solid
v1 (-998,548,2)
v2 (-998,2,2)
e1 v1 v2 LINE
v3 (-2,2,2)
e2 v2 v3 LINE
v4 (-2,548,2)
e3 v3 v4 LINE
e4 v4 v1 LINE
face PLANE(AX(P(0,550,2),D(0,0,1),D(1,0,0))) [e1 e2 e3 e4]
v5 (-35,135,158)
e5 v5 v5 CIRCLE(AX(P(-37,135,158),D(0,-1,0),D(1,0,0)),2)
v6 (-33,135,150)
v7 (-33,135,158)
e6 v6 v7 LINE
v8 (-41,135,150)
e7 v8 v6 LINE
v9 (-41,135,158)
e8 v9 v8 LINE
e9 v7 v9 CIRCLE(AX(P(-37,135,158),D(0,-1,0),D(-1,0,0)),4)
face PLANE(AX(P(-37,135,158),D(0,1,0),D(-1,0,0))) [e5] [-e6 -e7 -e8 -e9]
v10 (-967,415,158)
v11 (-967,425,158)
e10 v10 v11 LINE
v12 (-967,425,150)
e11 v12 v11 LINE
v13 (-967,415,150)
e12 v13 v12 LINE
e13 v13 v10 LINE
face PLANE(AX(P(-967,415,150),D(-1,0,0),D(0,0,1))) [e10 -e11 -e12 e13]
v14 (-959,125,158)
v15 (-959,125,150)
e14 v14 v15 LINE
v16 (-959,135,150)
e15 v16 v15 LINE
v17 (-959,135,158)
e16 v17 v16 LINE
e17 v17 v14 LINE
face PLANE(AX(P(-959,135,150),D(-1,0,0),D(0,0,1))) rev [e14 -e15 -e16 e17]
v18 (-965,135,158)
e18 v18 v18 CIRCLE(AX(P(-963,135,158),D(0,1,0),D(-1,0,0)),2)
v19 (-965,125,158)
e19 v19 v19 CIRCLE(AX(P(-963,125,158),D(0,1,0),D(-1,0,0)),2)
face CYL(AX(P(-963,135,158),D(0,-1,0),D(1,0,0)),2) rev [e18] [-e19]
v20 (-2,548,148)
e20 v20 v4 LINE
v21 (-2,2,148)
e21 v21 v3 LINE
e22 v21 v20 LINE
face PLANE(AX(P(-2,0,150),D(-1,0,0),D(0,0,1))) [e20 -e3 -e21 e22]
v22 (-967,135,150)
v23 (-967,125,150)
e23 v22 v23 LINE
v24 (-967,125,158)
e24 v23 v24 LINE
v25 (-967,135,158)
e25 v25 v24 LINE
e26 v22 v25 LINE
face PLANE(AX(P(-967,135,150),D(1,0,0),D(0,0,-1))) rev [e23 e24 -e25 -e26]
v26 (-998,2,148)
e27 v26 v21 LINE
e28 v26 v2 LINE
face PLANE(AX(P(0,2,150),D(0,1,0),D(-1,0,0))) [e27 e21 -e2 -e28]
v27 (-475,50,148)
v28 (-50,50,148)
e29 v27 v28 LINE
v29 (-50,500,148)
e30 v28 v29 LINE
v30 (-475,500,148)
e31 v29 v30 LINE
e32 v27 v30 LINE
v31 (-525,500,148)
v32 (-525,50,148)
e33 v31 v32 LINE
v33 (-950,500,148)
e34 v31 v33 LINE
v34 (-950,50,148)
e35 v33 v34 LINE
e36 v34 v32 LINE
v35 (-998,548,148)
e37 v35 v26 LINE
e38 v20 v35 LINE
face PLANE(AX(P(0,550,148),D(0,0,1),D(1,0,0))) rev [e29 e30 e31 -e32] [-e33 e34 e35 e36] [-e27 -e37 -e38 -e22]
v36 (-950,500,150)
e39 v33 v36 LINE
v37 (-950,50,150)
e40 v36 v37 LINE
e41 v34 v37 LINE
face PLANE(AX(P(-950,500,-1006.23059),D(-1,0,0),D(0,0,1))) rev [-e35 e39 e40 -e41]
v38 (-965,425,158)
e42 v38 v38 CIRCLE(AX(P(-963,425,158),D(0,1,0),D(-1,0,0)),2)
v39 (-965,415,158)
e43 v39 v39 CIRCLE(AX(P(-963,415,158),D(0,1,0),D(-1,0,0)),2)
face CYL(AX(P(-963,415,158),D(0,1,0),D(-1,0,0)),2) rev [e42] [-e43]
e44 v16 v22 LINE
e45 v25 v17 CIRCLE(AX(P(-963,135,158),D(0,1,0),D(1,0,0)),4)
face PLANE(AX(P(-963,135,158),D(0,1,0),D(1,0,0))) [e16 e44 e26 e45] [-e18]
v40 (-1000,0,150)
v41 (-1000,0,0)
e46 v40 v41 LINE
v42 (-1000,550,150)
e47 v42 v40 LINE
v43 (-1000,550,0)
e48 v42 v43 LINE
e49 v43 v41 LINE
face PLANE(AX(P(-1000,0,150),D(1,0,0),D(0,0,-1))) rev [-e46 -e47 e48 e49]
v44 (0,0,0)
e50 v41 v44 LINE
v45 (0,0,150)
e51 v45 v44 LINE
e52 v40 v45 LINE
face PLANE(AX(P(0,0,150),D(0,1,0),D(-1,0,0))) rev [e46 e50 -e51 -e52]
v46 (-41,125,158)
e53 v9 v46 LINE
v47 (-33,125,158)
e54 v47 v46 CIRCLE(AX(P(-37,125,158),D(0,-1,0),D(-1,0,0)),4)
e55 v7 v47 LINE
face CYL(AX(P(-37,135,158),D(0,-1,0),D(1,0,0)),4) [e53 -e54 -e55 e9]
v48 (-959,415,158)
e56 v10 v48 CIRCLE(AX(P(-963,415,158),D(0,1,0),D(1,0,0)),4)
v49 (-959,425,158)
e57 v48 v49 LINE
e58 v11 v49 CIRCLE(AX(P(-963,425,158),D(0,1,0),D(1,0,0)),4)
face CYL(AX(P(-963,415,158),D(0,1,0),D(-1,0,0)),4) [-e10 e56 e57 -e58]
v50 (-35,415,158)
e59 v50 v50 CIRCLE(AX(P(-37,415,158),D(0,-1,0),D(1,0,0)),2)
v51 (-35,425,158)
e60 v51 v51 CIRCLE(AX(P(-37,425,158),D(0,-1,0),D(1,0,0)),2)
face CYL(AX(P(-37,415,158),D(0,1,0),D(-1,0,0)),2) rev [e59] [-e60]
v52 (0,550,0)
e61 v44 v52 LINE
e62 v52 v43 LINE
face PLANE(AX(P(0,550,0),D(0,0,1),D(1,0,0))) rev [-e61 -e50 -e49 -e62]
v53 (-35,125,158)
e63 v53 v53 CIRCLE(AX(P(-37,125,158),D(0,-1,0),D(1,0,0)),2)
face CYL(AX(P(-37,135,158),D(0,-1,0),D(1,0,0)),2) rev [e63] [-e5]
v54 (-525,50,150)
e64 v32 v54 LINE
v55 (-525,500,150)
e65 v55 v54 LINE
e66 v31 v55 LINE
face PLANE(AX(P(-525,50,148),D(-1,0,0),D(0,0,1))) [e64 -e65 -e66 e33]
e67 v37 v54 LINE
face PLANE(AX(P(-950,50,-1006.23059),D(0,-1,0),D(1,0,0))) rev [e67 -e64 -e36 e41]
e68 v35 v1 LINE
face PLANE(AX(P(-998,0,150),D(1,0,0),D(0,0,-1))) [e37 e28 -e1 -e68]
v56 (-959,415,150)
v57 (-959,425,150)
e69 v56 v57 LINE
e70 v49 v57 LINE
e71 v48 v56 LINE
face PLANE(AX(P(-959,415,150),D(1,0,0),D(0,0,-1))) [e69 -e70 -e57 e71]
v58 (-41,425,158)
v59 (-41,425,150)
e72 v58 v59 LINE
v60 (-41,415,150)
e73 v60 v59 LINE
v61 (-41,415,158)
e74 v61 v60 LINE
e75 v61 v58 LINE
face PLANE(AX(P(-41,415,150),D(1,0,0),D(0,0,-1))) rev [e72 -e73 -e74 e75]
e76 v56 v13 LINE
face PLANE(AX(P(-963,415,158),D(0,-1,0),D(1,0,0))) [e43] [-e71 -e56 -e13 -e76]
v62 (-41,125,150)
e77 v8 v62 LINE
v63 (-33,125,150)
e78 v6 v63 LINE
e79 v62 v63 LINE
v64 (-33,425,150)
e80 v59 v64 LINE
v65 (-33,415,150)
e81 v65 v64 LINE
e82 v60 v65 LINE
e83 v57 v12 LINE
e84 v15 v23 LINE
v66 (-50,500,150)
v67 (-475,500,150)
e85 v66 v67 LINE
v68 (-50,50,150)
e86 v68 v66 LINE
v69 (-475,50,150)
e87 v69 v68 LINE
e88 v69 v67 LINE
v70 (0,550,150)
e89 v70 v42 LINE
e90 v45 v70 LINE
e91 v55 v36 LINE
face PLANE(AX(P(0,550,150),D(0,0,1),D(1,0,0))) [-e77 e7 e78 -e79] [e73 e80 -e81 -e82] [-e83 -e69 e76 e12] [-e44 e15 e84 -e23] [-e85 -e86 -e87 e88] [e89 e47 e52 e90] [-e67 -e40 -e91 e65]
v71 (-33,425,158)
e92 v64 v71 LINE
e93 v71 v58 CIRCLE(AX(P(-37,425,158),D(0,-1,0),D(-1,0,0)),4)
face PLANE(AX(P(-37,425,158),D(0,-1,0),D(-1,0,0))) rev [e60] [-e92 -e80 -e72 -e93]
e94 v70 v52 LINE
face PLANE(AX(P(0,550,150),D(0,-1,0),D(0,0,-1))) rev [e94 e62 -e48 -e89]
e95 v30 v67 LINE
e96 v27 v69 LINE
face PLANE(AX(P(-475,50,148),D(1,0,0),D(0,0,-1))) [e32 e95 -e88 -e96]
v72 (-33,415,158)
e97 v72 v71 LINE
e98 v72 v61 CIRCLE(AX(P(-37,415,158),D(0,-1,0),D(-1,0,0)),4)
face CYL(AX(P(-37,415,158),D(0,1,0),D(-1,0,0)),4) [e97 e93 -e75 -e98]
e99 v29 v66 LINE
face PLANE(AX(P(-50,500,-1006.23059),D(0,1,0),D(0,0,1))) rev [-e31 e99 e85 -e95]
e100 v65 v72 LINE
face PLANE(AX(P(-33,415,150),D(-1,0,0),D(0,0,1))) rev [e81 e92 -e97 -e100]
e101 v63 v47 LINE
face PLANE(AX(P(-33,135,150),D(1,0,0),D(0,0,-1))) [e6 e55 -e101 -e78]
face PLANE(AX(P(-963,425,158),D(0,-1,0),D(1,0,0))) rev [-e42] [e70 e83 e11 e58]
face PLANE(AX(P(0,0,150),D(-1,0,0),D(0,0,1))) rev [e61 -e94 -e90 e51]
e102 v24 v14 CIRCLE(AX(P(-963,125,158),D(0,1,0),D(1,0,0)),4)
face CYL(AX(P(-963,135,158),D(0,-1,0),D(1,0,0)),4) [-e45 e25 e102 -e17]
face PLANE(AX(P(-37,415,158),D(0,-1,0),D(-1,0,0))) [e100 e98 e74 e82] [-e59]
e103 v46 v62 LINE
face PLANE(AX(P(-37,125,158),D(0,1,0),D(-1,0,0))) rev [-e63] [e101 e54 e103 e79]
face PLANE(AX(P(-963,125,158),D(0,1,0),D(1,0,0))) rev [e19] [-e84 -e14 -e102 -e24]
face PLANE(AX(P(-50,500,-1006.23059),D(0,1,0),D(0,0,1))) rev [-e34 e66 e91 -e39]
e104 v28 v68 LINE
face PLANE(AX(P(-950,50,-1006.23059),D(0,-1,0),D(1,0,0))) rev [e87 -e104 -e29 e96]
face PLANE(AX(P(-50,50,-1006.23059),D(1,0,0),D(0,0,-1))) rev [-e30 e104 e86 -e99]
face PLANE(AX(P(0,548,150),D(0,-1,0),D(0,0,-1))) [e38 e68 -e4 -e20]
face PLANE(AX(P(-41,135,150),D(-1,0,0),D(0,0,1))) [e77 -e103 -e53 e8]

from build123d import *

# Parameters (mm, degrees)
SKETCH1_W               = 1000
SKETCH1_H               = 550
BASE_EXTRUDE_DEPTH      = 150
SKETCH2_W               = 900
SKETCH2_H               = 450
CUT_EXTRUDE1_DEPTH      = 148
SHELL3_START            = -998
SHELL3_OUTLINE_W        = 546
SHELL3_OUTLINE_H        = 146
SHELL3_DEPTH            = 996
SKETCH3_W               = 50
SKETCH3_H               = 450
BOSS_EXTRUDE1_DEPTH     = 2
SKETCH4_R               = 2
BOSS_EXTRUDE2_DEPTH     = 10
MIRROR2_COPY_1_SKETCH_R = 2
MIRROR2_COPY_1_DEPTH    = 10


# Read off the part's stored shape, not the designer's step: Shell3
with BuildPart() as part:
    # Sketch1 → Base-Extrude (new body)
    with BuildSketch(Plane.XY):
        with Locations((-500, 275)):
            Rectangle(SKETCH1_W, SKETCH1_H)
    extrude(amount=BASE_EXTRUDE_DEPTH)

    # Sketch2 → Cut-Extrude1 (cut)
    with BuildSketch(Plane.XY.offset(150)):
        with Locations((-500, 275)):
            Rectangle(SKETCH2_W, SKETCH2_H)
    extrude(amount=-CUT_EXTRUDE1_DEPTH, mode=Mode.SUBTRACT)

    # Shell3 outline → Shell3 (cut)
    with BuildSketch(Plane.YZ.offset(SHELL3_START)):
        with Locations((275, 75)):
            Rectangle(SHELL3_OUTLINE_W, SHELL3_OUTLINE_H)
    extrude(amount=SHELL3_DEPTH, mode=Mode.SUBTRACT)

    # Sketch3 → Boss-Extrude1 (add)
    with BuildSketch(Plane.XY.offset(150)):
        with Locations((-500, 275)):
            Rectangle(SKETCH3_W, SKETCH3_H)
    extrude(amount=-BOSS_EXTRUDE1_DEPTH)

    # Sketch4 → Boss-Extrude2 (add)
    with BuildSketch(Plane.XZ.offset(-125)):
        with BuildLine():
            Line((-41, 150), (-33, 150))
            Line((-33, 150), (-33, 158))
            ThreePointArc((-33, 158), (-37, 162), (-41, 158))
            Line((-41, 158), (-41, 150))
        make_face()
        with Locations((-37, 158)):
            Circle(SKETCH4_R, mode=Mode.SUBTRACT)
    boss_extrude2 = extrude(amount=-BOSS_EXTRUDE2_DEPTH)

    # Mirror1: Boss-Extrude2 across plane
    add(boss_extrude2.mirror(Plane.ZY.offset(500)))

    # Mirror2: Boss-Extrude2 across plane
    add(boss_extrude2.mirror(Plane(origin=(0, 275, 0), x_dir=(0, 0, 1), z_dir=(0, -1, 0))))

    # Mirror2 copy 1 sketch → Mirror2 copy 1 (add)
    with BuildSketch(Plane(origin=(-1000, 425, 0), x_dir=(-1, 0, 0), z_dir=(0, 1, 0))):
        with BuildLine():
            Line((-41, 150), (-33, 150))
            Line((-33, 150), (-33, 158))
            ThreePointArc((-33, 158), (-37, 162), (-41, 158))
            Line((-41, 158), (-41, 150))
        make_face()
        with Locations((-37, 158)):
            Circle(MIRROR2_COPY_1_SKETCH_R, mode=Mode.SUBTRACT)
    extrude(amount=-MIRROR2_COPY_1_DEPTH)


solid = part.part
